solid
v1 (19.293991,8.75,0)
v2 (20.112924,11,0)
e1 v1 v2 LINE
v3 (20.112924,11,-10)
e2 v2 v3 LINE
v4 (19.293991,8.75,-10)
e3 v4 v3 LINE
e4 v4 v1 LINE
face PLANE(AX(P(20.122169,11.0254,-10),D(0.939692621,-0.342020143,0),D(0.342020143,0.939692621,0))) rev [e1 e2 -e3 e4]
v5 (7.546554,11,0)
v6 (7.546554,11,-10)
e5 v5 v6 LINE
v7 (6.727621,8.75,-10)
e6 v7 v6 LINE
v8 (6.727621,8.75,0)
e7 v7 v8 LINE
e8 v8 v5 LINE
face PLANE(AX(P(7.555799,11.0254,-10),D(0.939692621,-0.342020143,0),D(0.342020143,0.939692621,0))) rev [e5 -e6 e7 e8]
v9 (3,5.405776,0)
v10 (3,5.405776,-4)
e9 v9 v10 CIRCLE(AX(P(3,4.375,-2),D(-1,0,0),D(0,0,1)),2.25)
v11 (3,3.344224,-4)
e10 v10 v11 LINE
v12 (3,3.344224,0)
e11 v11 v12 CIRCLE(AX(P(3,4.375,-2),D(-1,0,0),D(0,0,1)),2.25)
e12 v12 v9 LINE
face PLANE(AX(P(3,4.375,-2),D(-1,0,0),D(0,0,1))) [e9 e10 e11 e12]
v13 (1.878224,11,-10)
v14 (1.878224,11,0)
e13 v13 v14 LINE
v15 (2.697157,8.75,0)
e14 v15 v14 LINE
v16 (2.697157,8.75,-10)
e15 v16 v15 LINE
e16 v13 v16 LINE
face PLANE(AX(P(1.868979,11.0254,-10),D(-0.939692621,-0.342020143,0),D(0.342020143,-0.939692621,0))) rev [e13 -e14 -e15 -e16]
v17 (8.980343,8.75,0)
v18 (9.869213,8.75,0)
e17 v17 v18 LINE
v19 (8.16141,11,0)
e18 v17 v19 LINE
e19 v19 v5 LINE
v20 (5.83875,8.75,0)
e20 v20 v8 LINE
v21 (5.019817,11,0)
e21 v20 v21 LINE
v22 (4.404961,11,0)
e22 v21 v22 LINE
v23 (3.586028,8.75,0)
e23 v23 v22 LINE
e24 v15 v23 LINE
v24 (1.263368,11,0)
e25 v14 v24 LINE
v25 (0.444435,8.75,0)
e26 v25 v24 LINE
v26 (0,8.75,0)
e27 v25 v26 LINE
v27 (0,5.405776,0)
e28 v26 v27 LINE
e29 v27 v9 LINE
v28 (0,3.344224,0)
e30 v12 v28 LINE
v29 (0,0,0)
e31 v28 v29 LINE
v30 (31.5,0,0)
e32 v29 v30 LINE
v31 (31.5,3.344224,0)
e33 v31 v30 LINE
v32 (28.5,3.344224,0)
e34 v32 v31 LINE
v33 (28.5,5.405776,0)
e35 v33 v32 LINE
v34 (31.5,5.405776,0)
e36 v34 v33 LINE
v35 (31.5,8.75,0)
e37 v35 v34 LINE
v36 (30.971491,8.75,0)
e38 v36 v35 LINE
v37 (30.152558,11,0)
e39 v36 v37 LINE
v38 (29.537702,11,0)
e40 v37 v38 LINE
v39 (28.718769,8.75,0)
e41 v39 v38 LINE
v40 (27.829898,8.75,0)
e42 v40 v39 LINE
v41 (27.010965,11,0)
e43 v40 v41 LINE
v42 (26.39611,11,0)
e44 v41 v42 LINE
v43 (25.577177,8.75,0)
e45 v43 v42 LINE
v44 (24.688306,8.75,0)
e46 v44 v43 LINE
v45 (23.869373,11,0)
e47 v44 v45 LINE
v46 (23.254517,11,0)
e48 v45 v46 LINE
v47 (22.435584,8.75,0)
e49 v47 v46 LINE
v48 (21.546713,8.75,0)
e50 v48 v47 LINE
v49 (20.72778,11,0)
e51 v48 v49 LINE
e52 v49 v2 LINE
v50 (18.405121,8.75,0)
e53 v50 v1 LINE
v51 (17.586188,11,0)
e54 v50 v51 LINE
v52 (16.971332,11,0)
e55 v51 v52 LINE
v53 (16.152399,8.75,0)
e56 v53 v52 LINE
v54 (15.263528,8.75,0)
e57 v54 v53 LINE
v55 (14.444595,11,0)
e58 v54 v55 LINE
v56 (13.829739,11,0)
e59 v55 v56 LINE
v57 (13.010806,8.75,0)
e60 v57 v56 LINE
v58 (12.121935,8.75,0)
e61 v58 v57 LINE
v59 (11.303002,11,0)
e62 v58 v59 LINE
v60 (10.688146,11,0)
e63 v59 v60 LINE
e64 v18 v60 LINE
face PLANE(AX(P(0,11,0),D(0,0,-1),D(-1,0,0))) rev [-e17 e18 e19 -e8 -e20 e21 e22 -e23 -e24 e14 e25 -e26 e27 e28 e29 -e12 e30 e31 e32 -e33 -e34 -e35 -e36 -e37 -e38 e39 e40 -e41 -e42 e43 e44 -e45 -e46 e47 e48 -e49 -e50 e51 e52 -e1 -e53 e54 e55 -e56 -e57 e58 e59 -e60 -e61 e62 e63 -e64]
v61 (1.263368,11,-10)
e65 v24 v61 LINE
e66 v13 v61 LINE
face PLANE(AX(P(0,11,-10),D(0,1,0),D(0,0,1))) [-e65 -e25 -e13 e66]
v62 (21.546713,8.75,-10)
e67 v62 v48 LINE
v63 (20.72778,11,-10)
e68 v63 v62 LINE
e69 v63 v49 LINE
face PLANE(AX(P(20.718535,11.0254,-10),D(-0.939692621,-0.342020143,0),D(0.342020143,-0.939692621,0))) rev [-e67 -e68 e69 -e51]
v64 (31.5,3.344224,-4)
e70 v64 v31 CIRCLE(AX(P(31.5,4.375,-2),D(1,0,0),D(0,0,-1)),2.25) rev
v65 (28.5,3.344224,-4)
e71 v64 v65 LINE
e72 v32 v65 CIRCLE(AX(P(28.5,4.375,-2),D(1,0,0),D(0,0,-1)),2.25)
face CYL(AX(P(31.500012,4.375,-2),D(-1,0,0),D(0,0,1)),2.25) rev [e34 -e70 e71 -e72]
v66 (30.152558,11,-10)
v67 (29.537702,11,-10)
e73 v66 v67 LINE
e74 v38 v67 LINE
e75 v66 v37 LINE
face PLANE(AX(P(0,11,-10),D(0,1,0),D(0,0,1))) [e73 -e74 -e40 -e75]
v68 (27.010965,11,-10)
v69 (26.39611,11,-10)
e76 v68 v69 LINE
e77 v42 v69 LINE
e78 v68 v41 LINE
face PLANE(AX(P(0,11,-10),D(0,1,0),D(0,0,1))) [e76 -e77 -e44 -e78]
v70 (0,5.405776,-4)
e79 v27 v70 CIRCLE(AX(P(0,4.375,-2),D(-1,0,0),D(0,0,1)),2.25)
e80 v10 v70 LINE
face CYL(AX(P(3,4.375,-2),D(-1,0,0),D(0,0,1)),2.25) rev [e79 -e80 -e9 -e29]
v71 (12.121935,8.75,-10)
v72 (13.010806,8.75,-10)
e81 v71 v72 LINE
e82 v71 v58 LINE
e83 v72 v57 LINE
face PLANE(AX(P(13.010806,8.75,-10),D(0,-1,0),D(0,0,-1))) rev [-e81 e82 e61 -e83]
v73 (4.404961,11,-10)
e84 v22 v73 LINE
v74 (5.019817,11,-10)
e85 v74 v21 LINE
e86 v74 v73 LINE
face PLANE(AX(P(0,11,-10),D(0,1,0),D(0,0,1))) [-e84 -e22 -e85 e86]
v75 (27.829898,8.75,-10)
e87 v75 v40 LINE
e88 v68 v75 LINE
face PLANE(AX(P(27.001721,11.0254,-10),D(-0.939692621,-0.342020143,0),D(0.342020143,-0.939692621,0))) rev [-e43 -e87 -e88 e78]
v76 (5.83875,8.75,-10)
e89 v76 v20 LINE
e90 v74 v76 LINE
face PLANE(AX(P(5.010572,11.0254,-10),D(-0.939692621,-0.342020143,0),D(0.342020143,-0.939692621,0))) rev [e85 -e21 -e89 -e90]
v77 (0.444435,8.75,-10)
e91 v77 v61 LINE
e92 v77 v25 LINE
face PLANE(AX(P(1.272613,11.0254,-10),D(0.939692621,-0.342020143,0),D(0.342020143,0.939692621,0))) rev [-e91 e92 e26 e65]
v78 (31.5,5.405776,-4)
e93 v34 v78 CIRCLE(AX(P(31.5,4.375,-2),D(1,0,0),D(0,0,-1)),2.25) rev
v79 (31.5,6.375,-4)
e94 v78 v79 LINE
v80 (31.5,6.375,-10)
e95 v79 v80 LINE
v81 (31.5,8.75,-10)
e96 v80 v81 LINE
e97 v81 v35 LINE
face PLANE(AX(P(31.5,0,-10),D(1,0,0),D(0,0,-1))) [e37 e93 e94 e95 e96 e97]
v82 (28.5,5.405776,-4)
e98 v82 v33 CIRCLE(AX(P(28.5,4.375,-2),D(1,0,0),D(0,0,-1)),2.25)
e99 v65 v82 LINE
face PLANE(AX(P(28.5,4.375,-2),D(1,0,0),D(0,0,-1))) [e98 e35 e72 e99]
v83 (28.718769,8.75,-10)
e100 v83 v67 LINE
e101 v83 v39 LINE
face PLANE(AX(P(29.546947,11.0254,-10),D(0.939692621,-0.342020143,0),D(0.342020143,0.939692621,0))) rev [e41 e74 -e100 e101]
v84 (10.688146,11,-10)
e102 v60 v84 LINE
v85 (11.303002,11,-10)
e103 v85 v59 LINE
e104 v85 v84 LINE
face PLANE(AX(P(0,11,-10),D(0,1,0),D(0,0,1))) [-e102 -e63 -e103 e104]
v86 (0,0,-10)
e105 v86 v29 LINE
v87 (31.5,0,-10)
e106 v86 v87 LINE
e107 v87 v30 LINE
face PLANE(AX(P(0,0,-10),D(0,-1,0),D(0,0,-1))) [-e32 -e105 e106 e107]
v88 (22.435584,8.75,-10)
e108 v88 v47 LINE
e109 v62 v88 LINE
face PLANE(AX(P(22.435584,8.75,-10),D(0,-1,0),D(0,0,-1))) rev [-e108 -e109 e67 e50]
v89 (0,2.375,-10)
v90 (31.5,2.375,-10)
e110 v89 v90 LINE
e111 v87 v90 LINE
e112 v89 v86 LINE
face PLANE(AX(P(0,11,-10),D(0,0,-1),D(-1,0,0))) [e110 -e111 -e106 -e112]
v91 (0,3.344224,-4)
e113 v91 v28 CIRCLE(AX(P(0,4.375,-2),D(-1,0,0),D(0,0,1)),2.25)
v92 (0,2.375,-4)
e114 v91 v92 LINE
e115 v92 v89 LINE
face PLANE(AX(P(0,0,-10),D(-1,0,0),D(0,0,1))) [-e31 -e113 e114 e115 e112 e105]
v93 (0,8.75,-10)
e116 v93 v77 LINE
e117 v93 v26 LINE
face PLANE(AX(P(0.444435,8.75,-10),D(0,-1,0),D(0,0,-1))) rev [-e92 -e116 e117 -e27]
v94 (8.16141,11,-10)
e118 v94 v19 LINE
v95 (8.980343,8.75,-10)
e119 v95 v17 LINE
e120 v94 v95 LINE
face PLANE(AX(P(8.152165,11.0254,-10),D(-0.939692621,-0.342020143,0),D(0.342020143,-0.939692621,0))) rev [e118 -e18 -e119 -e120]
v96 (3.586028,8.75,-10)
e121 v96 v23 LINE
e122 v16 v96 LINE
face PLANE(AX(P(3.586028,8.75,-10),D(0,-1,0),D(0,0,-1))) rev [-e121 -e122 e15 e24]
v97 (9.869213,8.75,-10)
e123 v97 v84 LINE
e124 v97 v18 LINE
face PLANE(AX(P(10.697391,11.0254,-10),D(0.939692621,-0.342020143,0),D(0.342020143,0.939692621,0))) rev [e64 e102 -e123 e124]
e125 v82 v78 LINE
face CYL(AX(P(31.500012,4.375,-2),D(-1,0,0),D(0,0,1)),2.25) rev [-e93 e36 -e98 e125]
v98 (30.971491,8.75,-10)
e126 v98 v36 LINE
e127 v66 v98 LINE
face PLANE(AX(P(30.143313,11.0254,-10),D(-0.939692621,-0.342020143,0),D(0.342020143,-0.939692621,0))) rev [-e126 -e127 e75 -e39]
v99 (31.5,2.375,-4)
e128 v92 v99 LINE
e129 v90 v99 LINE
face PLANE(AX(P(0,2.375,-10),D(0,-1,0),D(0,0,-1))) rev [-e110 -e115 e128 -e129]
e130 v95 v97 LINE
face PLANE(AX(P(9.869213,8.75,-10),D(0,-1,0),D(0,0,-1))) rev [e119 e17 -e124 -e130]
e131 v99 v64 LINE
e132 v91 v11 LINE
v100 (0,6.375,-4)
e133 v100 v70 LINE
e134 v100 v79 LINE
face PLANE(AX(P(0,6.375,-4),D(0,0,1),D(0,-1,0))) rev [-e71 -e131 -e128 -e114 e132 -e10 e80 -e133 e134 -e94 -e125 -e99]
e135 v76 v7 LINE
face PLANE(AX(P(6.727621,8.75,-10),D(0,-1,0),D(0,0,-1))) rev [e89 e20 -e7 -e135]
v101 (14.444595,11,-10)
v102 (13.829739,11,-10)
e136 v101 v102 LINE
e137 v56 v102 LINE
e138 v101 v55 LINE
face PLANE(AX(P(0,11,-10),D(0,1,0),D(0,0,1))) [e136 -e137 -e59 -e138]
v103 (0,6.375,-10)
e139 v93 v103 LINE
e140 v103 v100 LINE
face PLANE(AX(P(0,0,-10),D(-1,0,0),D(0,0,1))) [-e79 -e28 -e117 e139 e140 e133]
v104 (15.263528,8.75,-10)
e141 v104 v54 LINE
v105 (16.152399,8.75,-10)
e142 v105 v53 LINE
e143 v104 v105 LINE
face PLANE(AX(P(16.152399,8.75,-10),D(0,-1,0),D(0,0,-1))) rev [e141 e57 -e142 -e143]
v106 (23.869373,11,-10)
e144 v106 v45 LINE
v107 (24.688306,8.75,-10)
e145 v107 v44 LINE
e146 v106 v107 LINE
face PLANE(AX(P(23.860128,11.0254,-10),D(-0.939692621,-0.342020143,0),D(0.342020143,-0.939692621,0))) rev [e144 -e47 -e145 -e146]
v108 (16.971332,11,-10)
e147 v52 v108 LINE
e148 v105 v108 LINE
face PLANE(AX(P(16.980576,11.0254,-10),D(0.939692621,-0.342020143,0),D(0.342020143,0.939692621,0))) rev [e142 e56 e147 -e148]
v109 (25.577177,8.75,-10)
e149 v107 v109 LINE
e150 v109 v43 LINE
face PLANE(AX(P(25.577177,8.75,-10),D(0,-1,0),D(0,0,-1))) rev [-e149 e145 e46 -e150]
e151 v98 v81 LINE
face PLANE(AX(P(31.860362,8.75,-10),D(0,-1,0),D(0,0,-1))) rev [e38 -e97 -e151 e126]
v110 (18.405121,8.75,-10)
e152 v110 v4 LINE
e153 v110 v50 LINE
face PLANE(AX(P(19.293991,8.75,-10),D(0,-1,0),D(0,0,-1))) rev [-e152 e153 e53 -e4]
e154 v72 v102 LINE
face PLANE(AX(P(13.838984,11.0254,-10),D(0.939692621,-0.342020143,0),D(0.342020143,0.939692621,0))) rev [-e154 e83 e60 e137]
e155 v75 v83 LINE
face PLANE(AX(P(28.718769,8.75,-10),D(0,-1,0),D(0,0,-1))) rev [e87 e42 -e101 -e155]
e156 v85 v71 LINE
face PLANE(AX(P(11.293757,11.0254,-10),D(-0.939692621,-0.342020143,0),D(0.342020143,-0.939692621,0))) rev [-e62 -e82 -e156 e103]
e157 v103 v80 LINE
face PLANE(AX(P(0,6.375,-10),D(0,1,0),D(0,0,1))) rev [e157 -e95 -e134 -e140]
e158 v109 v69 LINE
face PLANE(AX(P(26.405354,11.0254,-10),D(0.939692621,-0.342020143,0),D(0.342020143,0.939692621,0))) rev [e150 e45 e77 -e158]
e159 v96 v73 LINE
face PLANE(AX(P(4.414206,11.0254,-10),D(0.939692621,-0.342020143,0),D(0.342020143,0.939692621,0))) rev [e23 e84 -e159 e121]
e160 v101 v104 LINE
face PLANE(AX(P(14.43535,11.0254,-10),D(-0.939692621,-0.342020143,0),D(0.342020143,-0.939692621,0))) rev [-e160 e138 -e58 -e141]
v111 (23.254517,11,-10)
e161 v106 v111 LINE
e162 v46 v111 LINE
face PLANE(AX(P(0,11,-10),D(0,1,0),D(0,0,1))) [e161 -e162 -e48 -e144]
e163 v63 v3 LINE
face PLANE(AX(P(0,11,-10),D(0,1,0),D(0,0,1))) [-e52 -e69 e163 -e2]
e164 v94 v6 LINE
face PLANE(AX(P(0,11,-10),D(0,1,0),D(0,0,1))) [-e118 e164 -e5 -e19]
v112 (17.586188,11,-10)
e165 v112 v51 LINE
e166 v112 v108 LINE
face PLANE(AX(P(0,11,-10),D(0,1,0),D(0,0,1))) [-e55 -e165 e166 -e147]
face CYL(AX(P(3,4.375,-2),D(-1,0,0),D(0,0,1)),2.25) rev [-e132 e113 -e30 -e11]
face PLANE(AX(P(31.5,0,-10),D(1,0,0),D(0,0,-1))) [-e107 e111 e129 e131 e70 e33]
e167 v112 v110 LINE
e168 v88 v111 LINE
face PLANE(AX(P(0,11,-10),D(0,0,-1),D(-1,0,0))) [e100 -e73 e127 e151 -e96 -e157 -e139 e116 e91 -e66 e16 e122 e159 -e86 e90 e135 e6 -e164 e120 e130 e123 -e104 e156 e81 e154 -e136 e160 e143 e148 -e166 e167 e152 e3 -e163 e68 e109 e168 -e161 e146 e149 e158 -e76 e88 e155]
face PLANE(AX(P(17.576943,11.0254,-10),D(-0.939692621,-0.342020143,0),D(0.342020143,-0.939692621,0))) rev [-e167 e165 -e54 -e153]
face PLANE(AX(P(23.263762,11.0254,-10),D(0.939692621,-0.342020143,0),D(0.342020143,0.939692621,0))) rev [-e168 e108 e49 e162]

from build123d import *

# Parameters (mm, degrees)
BLANKSKE_W              = 800
BLANKSKE_H              = 11
BLANK_DEPTH             = 10
TOOTHCUTSIM_DEPTH       = 801.138113078
TEETHCUTS_COUNT         = 255
TEETHCUTS_PITCH         = 3.14159265
CUT_EXTRUDE1_DEPTH      = 801.138113078
CUT_EXTRUDE1_DEPTH_BACK = 801.138113078
SKETCH1_W               = 6
SKETCH1_H               = 4
CUT_EXTRUDE2_DEPTH      = 801.138113078
CUT_EXTRUDE2_DEPTH_BACK = 801.138113078
SKETCH3_OUTSIDE_W       = 962.028
SKETCH3_OUTSIDE_H       = 173.028
SKETCH3_OUTSIDE_W_2     = 31.5
SKETCH3_OUTSIDE_H_2     = 25.836038267
CUT_EXTRUDE3_DEPTH      = 35.8317384
CUT_EXTRUDE3_DEPTH_BACK = 3
SKETCH4_R               = 2.25
CUT_EXTRUDE4_START      = -28.5
SKETCH4_2_R             = 2.25
CUT_EXTRUDE4_DEPTH      = 3


with BuildPart() as part:
    # BlankSke → Blank (new body)
    with BuildSketch(Plane.XY):
        with Locations((400, 5.5)):
            Rectangle(BLANKSKE_W, BLANKSKE_H)
    extrude(amount=-BLANK_DEPTH)

    # TooCutSkeSim → ToothCutSim (cut, through all)
    with BuildSketch(Plane.XY):
        Polygon((0.44443537, 8.75), (-0.44443537, 8.75), (-1.272613241, 11.0254), (1.272613241, 11.0254), align=None)
    toothcutsim = extrude(amount=-TOOTHCUTSIM_DEPTH, mode=Mode.SUBTRACT)

    # TeethCuts: ToothCutSim ×255
    with Locations(*[(i * TEETHCUTS_PITCH, 0, 0) for i in range(1, TEETHCUTS_COUNT)]):
        add(toothcutsim, mode=Mode.SUBTRACT)

    # Sketch1 → Cut-Extrude1 (cut, two sides: drawn at the far end of the back side and taken through both)
    with BuildSketch(Plane(origin=(800, 0, 0), x_dir=(0, 0, -1), z_dir=(1, 0, 0)).offset(-CUT_EXTRUDE1_DEPTH_BACK)):
        with Locations((7, 4.375)):
            Rectangle(SKETCH1_W, SKETCH1_H)
    extrude(amount=CUT_EXTRUDE1_DEPTH + CUT_EXTRUDE1_DEPTH_BACK, mode=Mode.SUBTRACT)

    # Sketch3 outside → Cut-Extrude2 (cut, two sides: drawn at the far end of the back side and taken through both)
    with BuildSketch(Plane.XY.offset(-CUT_EXTRUDE2_DEPTH_BACK)):
        with Locations((400, 5.5)):
            Rectangle(SKETCH3_OUTSIDE_W, SKETCH3_OUTSIDE_H)
        with Locations((15.75, 12.918019134)):
            Rectangle(SKETCH3_OUTSIDE_W_2, SKETCH3_OUTSIDE_H_2, mode=Mode.SUBTRACT)
    extrude(amount=CUT_EXTRUDE2_DEPTH + CUT_EXTRUDE2_DEPTH_BACK, mode=Mode.SUBTRACT)

    # Sketch4 → Cut-Extrude3 (cut, two sides: drawn at the far end of the back side and taken through both)
    with BuildSketch(Plane(origin=(31.5, 0, 0), x_dir=(0, 0, -1), z_dir=(1, 0, 0)).offset(-CUT_EXTRUDE3_DEPTH_BACK)):
        with Locations((2, 4.375)):
            Circle(SKETCH4_R)
    extrude(amount=CUT_EXTRUDE3_DEPTH + CUT_EXTRUDE3_DEPTH_BACK, mode=Mode.SUBTRACT)

    # Sketch4<2> → Cut-Extrude4 (cut)
    with BuildSketch(Plane(origin=(31.5, 0, 0), x_dir=(0, 0, -1), z_dir=(1, 0, 0)).offset(CUT_EXTRUDE4_START)):
        with Locations((2, 4.375)):
            Circle(SKETCH4_2_R)
    extrude(amount=-CUT_EXTRUDE4_DEPTH, mode=Mode.SUBTRACT)


solid = part.part
